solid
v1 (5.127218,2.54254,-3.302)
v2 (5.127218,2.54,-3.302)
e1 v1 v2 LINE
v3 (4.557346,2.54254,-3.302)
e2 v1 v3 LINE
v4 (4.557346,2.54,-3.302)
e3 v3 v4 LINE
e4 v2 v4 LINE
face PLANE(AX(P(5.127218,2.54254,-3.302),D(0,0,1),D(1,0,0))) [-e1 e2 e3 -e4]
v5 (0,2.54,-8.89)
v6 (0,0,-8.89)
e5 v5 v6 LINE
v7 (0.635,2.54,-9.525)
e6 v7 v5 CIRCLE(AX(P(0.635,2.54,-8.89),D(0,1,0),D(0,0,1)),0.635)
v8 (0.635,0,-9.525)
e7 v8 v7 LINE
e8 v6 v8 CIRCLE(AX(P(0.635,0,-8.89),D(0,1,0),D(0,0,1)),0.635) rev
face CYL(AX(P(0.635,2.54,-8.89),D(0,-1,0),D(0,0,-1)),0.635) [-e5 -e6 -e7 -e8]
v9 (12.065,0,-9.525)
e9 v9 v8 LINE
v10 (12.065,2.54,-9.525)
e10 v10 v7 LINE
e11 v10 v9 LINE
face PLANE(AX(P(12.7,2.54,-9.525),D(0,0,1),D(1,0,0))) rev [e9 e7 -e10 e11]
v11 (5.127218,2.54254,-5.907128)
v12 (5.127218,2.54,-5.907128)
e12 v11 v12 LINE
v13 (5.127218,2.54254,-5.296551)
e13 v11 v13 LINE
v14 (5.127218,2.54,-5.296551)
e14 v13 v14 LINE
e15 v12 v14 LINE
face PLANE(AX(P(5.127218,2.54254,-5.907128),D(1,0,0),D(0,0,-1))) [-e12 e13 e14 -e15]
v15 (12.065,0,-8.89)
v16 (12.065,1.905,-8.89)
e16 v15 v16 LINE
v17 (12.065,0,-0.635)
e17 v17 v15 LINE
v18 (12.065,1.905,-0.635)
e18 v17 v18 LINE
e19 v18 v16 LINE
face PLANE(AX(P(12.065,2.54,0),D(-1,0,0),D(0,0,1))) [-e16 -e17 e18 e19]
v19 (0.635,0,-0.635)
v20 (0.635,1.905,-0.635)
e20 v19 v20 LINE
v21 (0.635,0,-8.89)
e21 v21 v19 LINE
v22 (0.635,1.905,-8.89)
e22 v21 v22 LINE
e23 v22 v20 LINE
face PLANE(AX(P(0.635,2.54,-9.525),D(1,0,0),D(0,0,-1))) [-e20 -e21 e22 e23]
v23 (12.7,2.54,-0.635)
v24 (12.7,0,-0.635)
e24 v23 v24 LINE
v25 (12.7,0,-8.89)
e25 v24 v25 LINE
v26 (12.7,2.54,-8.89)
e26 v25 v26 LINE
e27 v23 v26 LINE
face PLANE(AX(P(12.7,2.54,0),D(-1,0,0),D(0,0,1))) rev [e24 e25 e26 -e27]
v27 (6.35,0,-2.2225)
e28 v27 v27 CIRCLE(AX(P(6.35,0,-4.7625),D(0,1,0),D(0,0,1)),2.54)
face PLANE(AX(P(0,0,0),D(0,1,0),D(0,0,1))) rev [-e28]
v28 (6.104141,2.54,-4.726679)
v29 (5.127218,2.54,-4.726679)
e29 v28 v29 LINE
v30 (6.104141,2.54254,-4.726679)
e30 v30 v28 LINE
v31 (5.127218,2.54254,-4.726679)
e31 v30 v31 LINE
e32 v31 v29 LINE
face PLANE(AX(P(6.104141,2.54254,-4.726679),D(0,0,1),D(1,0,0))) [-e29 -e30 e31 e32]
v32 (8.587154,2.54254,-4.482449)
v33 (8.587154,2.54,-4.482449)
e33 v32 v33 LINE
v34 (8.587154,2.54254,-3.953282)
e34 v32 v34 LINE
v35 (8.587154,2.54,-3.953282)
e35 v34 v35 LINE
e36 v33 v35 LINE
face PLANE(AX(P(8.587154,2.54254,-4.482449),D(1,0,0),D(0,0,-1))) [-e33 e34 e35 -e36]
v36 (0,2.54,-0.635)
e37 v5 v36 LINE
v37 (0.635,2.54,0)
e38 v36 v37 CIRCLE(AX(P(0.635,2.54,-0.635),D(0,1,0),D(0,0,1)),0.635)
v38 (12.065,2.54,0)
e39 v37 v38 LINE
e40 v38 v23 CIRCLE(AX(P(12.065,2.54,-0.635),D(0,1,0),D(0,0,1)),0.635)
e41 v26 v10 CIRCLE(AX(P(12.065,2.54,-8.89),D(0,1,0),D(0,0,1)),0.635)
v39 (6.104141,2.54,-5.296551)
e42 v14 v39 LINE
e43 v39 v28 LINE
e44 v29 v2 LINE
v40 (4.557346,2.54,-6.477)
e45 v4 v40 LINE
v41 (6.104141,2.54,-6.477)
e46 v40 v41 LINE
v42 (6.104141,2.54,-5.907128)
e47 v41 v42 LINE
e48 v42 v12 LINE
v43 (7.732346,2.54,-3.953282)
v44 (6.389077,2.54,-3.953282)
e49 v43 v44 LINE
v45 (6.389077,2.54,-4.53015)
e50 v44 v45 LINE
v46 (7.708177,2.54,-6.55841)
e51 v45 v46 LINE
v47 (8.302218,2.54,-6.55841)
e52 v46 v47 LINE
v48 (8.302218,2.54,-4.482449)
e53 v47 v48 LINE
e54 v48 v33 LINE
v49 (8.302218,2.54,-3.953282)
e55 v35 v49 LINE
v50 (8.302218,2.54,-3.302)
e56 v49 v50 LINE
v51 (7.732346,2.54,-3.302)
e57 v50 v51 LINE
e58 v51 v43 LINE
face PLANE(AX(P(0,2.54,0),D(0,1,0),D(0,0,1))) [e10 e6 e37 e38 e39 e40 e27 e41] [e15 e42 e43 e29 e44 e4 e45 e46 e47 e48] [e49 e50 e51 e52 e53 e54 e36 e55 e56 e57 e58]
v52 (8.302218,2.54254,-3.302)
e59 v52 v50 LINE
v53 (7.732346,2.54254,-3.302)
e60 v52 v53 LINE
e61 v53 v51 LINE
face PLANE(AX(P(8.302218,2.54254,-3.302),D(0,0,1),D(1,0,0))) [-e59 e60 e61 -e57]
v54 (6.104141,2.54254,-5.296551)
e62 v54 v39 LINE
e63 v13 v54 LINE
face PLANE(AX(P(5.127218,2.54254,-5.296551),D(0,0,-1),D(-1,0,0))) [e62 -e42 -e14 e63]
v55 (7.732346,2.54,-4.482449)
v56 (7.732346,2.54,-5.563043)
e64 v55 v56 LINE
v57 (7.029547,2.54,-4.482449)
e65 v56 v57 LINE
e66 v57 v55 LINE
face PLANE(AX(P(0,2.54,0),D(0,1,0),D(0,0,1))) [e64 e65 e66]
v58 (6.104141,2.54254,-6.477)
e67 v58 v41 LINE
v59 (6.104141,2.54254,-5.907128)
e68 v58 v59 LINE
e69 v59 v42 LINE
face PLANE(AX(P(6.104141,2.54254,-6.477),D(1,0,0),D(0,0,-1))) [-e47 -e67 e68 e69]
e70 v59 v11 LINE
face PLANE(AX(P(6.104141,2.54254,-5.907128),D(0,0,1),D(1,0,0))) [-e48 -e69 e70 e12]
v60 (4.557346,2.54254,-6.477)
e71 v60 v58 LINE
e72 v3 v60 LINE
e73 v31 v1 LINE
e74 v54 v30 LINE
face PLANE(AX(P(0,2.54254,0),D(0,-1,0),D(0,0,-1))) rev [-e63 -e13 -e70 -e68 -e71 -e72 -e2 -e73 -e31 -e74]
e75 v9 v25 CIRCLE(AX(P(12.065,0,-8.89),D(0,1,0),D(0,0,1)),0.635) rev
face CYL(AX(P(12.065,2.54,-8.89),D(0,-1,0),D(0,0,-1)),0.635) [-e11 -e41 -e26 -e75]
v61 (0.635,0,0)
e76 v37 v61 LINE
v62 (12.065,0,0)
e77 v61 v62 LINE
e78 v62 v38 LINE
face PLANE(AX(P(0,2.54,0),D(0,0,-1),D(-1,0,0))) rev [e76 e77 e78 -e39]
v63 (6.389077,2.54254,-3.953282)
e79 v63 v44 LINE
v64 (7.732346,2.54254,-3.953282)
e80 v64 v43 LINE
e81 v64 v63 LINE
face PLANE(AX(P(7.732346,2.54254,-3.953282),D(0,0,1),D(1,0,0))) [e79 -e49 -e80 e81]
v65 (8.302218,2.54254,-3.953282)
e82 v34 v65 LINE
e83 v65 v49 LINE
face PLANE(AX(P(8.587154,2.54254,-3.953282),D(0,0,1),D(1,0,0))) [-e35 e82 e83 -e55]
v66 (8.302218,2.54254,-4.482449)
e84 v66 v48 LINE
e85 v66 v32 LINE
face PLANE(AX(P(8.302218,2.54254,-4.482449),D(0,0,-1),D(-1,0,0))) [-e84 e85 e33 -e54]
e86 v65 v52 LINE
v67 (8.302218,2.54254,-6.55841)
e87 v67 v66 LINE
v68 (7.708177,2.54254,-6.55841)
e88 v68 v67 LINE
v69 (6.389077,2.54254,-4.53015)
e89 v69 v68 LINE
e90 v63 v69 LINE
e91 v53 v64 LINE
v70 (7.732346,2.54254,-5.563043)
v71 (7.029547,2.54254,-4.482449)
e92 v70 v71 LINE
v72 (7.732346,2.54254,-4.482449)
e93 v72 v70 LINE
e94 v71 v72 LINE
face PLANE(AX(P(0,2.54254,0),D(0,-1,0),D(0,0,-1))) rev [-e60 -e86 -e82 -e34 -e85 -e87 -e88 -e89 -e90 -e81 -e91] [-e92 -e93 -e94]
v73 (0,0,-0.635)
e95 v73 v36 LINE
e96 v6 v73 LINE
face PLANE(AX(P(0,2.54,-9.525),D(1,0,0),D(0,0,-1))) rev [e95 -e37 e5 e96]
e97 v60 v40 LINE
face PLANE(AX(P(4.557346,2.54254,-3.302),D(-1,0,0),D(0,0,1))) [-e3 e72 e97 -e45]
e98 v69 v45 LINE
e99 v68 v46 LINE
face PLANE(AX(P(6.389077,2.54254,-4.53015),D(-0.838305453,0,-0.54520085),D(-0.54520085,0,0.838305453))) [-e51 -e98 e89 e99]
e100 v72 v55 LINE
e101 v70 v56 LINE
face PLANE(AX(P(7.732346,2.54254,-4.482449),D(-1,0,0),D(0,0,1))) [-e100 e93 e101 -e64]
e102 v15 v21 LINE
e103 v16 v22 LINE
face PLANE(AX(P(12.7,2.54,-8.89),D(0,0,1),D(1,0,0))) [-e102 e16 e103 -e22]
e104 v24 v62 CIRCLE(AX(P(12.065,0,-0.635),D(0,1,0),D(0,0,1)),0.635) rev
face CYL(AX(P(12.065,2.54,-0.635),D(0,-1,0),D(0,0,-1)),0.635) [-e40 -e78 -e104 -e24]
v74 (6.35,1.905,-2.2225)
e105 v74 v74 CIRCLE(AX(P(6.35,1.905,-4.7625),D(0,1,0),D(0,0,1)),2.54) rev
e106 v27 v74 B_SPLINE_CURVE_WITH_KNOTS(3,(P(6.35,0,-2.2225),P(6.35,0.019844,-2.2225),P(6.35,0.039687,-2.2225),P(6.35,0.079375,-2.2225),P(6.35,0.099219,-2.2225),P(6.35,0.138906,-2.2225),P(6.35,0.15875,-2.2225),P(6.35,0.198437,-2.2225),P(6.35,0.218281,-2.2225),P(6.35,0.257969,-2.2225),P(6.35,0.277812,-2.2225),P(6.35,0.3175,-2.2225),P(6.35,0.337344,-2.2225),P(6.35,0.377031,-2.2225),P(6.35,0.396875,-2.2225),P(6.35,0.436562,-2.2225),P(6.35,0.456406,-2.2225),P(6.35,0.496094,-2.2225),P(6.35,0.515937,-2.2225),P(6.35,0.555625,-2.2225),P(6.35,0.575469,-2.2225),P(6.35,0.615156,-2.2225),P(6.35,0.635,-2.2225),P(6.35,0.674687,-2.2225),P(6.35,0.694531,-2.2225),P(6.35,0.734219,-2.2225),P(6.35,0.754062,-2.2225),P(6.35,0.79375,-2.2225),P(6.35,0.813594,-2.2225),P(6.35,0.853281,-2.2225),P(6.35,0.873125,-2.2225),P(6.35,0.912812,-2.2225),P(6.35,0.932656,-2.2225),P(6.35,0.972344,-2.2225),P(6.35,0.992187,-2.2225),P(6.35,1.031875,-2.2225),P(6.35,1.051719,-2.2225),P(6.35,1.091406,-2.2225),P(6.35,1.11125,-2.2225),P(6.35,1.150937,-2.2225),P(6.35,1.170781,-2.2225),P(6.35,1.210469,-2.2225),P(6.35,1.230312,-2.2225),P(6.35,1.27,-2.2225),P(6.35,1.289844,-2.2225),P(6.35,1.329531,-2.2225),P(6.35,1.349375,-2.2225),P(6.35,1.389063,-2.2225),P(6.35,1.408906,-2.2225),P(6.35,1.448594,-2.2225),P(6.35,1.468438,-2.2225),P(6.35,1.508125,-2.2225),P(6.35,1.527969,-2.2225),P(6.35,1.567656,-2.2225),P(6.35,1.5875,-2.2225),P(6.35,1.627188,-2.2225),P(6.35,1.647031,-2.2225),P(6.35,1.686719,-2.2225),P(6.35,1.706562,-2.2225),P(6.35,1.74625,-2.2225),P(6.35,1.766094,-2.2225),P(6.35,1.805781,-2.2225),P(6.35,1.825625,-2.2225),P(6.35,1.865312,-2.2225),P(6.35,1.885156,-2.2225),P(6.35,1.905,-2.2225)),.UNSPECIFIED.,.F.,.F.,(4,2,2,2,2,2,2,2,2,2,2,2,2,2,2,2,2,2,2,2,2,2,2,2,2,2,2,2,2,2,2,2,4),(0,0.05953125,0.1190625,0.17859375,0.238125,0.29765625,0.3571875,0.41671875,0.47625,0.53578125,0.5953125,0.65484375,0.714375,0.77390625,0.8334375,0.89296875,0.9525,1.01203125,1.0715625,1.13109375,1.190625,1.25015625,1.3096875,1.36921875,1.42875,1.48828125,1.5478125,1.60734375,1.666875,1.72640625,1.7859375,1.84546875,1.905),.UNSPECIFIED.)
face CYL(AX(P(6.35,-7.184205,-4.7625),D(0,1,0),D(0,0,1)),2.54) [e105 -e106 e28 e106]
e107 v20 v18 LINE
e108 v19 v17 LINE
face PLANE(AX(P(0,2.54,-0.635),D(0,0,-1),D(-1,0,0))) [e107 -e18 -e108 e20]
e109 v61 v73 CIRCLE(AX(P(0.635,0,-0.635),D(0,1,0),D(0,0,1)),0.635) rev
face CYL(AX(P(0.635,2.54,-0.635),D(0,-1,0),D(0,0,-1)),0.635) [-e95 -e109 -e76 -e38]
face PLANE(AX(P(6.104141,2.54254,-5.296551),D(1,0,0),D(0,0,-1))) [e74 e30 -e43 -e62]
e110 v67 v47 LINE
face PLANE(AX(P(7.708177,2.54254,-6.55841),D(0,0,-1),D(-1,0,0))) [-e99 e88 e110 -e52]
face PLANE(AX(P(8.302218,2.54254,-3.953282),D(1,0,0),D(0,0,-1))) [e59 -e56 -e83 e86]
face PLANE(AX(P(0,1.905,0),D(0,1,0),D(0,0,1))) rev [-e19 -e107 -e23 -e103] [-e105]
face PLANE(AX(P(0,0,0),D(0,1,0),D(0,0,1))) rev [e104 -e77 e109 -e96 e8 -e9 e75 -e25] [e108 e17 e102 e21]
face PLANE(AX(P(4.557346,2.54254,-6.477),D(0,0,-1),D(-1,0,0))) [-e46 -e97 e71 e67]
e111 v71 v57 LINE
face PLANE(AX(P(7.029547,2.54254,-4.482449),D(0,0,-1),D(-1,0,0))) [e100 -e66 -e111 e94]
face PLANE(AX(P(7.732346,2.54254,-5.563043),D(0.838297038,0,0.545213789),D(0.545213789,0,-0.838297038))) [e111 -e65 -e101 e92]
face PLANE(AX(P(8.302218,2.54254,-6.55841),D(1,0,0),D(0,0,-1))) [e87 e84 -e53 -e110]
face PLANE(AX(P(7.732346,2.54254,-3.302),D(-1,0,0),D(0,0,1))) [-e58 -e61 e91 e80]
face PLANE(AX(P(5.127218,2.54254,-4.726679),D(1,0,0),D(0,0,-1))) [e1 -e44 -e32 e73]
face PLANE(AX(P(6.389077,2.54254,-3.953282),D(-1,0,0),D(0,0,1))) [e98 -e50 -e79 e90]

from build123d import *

# Parameters (mm, degrees)
SKETCH1_W           = 12.7
SKETCH1_H           = 9.525
BOSS_EXTRUDE1_DEPTH = 2.54
FILLET1_R           = 0.635
SHELL1_START        = 0.635
SHELL1_OUTLINE_W    = 1.905
SHELL1_OUTLINE_H    = 8.255
SHELL1_DEPTH        = 11.43
SKETCH2_R           = 2.54
BOSS_EXTRUDE2_DEPTH = 1.905
BOSS_EXTRUDE3_DEPTH = 0.00254


# Read off the part's stored shape, not the designer's step: Shell1
with BuildPart() as part:
    # Sketch1 → Boss-Extrude1 (new body)
    with BuildSketch(Plane(origin=(0, 0, 0), x_dir=(1, 0, 0), z_dir=(0, 1, 0))):
        with Locations((6.35, 4.7625)):
            Rectangle(SKETCH1_W, SKETCH1_H)
    extrude(amount=BOSS_EXTRUDE1_DEPTH)

    # Fillet1
    fillet1_edges = [part.edges().sort_by_distance(p)[0] for p in [
        (0, 1.27, -9.525),
        (12.7, 1.27, -9.525),
        (12.7, 1.27, 0),
        (0, 1.27, 0),
    ]]
    fillet(fillet1_edges, radius=FILLET1_R)

    # Shell1 outline → Shell1 (cut)
    with BuildSketch(Plane.YZ.offset(SHELL1_START)):
        with Locations((0.9525, -4.7625)):
            Rectangle(SHELL1_OUTLINE_W, SHELL1_OUTLINE_H)
    extrude(amount=SHELL1_DEPTH, mode=Mode.SUBTRACT)

    # Sketch2 → Boss-Extrude2 (add)
    with BuildSketch(Plane(origin=(0, 1.905, 0), x_dir=(-1, 0, 0), z_dir=(0, -1, 0))):
        with Locations(Location((-6.35, 4.7625, 0), (0, 0, 270))):
            Circle(SKETCH2_R)
    extrude(amount=BOSS_EXTRUDE2_DEPTH)

    # Sketch3 → Boss-Extrude3 (add)
    # profile 1 of 2: a face of its own
    with BuildSketch(Plane(origin=(0, 2.54, 0), x_dir=(1, 0, 0), z_dir=(0, 1, 0))):
        Polygon((4.557346154, 6.477), (6.104141026, 6.477), (6.104141026, 5.907128205), (5.127217949, 5.907128205), (5.127217949, 5.296551282), (6.104141026, 5.296551282), (6.104141026, 4.726679487), (5.127217949, 4.726679487), (5.127217949, 3.302), (4.557346154, 3.302), align=None)
    # profile 2 of 2: a face of its own
    with BuildSketch(Plane(origin=(0, 2.54, 0), x_dir=(1, 0, 0), z_dir=(0, 1, 0))):
        Polygon((7.708177484, 6.558410256), (8.302217949, 6.558410256), (8.302217949, 4.482448718), (8.587153846, 4.482448718), (8.587153846, 3.953282051), (8.302217949, 3.953282051), (8.302217949, 3.302), (7.732346154, 3.302), (7.732346154, 3.953282051), (6.389076923, 3.953282051), (6.389076923, 4.53015004), align=None)
        Polygon((7.732346154, 4.482448718), (7.732346154, 5.563042668), (7.029546675, 4.482448718), align=None, mode=Mode.SUBTRACT)
    extrude(amount=BOSS_EXTRUDE3_DEPTH)


solid = part.part
